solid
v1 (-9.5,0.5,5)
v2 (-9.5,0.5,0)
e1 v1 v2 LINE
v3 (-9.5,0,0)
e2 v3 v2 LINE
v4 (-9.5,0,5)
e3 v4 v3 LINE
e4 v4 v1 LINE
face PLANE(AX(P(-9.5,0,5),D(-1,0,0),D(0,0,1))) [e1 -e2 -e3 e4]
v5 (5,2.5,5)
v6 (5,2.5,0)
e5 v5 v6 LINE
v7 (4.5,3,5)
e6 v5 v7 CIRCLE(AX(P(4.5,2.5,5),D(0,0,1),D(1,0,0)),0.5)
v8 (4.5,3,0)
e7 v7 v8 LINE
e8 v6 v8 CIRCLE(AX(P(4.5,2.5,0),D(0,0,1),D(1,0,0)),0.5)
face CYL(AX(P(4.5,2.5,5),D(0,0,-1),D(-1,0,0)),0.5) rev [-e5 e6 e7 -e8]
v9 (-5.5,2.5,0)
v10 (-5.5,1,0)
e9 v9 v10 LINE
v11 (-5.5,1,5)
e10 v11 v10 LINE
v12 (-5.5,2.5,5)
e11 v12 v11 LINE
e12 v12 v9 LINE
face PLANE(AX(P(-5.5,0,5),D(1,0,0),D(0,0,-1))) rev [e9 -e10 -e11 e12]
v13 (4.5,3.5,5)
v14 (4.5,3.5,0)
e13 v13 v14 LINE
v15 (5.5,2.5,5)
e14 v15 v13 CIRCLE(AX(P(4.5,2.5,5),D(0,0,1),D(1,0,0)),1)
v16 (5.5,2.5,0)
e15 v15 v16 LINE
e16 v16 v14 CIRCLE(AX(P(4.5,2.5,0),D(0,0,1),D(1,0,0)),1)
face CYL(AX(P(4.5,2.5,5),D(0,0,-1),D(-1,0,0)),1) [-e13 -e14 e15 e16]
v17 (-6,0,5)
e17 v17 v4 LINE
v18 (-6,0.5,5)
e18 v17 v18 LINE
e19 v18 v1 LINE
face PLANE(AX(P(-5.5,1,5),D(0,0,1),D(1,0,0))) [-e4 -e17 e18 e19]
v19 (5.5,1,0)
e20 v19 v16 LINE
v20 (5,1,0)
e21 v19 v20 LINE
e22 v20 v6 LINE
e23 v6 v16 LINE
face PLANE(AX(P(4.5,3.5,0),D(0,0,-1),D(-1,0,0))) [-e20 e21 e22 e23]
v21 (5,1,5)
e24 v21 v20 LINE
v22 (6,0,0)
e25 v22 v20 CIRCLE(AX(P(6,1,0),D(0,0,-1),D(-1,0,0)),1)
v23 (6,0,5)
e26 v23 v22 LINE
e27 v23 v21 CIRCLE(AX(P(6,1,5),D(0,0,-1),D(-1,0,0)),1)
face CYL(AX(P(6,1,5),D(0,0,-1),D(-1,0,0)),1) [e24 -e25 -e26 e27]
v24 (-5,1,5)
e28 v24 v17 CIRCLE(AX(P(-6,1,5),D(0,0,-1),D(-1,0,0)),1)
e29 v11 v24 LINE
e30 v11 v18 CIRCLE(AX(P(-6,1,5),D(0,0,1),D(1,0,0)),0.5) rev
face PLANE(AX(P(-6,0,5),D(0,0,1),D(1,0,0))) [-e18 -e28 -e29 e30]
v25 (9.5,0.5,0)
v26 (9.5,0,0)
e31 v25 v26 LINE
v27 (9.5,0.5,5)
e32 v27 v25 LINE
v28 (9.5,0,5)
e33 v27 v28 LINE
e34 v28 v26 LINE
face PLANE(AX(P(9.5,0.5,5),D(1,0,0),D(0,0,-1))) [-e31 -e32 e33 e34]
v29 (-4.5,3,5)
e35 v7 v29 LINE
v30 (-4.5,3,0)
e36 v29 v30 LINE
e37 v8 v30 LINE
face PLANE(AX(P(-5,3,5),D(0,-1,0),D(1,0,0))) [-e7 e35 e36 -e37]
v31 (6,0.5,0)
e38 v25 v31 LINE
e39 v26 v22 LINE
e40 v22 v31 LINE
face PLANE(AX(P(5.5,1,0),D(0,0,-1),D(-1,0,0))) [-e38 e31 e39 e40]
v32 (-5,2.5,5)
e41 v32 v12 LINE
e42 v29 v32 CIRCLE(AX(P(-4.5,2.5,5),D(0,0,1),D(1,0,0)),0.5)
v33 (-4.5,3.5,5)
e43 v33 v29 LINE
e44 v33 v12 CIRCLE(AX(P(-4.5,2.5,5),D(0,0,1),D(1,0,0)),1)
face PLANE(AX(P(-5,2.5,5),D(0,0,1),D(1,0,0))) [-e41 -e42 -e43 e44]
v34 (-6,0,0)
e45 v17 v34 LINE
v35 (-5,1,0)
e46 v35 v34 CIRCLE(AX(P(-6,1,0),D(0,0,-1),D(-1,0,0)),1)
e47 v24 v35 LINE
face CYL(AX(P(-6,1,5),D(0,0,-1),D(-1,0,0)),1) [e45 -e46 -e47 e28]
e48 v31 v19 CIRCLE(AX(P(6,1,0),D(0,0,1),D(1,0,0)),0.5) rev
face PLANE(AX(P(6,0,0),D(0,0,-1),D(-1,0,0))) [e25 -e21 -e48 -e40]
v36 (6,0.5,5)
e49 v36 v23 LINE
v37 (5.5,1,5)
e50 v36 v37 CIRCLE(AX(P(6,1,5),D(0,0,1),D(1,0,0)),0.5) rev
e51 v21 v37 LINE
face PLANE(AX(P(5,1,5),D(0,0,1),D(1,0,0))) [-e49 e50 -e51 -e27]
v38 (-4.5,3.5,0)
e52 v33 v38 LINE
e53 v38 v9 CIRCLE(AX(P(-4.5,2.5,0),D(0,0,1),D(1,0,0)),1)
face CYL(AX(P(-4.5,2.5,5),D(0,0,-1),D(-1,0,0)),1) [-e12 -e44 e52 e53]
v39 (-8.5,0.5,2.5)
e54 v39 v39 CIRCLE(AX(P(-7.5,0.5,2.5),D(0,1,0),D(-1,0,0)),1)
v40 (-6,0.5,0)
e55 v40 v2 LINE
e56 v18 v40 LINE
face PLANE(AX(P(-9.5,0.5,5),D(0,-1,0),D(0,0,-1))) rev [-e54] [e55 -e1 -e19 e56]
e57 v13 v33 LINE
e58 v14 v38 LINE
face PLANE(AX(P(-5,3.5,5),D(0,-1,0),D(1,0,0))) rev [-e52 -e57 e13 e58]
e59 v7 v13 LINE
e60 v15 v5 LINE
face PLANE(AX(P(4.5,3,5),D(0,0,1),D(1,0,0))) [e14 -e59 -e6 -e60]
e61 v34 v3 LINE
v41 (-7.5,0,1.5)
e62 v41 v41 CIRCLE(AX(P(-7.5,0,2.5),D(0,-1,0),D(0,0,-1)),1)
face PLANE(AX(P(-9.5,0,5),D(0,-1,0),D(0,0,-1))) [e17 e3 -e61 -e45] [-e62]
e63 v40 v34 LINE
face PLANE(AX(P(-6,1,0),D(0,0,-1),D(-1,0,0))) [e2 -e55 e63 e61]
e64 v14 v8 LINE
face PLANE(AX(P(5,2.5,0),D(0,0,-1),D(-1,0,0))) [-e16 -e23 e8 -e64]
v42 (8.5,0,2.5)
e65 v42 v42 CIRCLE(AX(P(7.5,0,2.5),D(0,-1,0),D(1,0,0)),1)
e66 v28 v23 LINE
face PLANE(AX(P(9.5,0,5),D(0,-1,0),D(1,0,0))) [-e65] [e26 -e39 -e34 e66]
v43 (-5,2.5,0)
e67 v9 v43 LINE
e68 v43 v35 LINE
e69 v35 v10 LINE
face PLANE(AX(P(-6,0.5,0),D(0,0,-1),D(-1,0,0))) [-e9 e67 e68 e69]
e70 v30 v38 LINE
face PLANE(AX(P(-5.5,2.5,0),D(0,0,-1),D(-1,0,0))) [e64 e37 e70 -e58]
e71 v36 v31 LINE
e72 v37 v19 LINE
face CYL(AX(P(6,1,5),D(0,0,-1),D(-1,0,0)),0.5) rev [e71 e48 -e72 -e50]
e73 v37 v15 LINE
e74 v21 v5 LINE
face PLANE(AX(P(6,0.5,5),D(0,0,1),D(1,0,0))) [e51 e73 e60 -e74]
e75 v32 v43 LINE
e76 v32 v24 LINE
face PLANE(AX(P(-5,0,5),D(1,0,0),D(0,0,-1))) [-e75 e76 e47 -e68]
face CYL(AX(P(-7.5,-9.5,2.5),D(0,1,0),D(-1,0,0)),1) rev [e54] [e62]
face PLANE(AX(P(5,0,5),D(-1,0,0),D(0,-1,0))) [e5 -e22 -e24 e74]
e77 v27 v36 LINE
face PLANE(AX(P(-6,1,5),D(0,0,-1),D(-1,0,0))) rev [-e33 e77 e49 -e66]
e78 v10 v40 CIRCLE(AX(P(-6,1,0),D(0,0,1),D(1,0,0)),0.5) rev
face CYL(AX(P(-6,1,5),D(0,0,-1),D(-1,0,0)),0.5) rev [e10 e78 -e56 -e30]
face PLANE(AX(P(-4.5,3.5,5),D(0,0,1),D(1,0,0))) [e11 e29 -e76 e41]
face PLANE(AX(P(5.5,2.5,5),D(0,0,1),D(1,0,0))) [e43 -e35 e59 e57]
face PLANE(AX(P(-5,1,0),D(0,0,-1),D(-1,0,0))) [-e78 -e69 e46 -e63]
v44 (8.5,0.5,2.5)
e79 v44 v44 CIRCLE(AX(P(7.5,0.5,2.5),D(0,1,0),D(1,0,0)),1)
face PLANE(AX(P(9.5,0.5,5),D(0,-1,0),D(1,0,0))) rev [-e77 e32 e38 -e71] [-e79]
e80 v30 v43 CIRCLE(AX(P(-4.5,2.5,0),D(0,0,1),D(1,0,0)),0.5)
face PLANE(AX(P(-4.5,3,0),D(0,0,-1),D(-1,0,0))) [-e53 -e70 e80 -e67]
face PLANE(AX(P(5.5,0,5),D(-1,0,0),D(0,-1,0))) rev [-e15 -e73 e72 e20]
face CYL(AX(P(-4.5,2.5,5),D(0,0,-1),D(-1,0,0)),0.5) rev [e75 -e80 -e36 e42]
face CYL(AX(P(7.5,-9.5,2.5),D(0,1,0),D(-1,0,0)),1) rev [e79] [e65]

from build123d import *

# Parameters (mm, degrees)
BASE_FLANGE1_DEPTH = 5
SKETCH7_R          = 1
CUT_EXTRUDE1_DEPTH = 10


# Sheet-metal steps are written as plain solids
with BuildPart() as part:
    # Sketch2 → Base-Flange1 (new body)
    with BuildSketch(Plane.XY):
        with BuildLine():
            Line((-9.5, 0), (-6, 0))
            ThreePointArc((-6, 0), (-5.292893219, 0.292893219), (-5, 1))
            Line((-5, 1), (-5, 2.5))
            ThreePointArc((-5, 2.5), (-4.853553391, 2.853553391), (-4.5, 3))
            Line((-4.5, 3), (4.5, 3))
            ThreePointArc((4.5, 3), (4.853553391, 2.853553391), (5, 2.5))
            Line((5, 2.5), (5, 1))
            ThreePointArc((5, 1), (5.292893219, 0.292893219), (6, 0))
            Line((6, 0), (9.5, 0))
            Line((9.5, 0), (9.5, 0.5))
            Line((9.5, 0.5), (6, 0.5))
            ThreePointArc((6, 0.5), (5.646446609, 0.646446609), (5.5, 1))
            Line((5.5, 1), (5.5, 2.5))
            ThreePointArc((5.5, 2.5), (5.207106781, 3.207106781), (4.5, 3.5))
            Line((4.5, 3.5), (-4.5, 3.5))
            ThreePointArc((-4.5, 3.5), (-5.207106781, 3.207106781), (-5.5, 2.5))
            Line((-5.5, 2.5), (-5.5, 1))
            ThreePointArc((-5.5, 1), (-5.646446609, 0.646446609), (-6, 0.5))
            Line((-6, 0.5), (-9.5, 0.5))
            Line((-9.5, 0.5), (-9.5, 0))
        make_face()
    extrude(amount=BASE_FLANGE1_DEPTH)

    # Sketch7 → Cut-Extrude1 (cut)
    with BuildSketch(Plane(origin=(0, 0.5, 0), x_dir=(1, 0, 0), z_dir=(0, 1, 0))):
        with Locations(Location((-7.5, -2.5, 0), (0, 0, 180))):
            Circle(SKETCH7_R)
        with Locations((7.5, -2.5)):
            Circle(SKETCH7_R)
    extrude(amount=-CUT_EXTRUDE1_DEPTH, mode=Mode.SUBTRACT)


solid = part.part
